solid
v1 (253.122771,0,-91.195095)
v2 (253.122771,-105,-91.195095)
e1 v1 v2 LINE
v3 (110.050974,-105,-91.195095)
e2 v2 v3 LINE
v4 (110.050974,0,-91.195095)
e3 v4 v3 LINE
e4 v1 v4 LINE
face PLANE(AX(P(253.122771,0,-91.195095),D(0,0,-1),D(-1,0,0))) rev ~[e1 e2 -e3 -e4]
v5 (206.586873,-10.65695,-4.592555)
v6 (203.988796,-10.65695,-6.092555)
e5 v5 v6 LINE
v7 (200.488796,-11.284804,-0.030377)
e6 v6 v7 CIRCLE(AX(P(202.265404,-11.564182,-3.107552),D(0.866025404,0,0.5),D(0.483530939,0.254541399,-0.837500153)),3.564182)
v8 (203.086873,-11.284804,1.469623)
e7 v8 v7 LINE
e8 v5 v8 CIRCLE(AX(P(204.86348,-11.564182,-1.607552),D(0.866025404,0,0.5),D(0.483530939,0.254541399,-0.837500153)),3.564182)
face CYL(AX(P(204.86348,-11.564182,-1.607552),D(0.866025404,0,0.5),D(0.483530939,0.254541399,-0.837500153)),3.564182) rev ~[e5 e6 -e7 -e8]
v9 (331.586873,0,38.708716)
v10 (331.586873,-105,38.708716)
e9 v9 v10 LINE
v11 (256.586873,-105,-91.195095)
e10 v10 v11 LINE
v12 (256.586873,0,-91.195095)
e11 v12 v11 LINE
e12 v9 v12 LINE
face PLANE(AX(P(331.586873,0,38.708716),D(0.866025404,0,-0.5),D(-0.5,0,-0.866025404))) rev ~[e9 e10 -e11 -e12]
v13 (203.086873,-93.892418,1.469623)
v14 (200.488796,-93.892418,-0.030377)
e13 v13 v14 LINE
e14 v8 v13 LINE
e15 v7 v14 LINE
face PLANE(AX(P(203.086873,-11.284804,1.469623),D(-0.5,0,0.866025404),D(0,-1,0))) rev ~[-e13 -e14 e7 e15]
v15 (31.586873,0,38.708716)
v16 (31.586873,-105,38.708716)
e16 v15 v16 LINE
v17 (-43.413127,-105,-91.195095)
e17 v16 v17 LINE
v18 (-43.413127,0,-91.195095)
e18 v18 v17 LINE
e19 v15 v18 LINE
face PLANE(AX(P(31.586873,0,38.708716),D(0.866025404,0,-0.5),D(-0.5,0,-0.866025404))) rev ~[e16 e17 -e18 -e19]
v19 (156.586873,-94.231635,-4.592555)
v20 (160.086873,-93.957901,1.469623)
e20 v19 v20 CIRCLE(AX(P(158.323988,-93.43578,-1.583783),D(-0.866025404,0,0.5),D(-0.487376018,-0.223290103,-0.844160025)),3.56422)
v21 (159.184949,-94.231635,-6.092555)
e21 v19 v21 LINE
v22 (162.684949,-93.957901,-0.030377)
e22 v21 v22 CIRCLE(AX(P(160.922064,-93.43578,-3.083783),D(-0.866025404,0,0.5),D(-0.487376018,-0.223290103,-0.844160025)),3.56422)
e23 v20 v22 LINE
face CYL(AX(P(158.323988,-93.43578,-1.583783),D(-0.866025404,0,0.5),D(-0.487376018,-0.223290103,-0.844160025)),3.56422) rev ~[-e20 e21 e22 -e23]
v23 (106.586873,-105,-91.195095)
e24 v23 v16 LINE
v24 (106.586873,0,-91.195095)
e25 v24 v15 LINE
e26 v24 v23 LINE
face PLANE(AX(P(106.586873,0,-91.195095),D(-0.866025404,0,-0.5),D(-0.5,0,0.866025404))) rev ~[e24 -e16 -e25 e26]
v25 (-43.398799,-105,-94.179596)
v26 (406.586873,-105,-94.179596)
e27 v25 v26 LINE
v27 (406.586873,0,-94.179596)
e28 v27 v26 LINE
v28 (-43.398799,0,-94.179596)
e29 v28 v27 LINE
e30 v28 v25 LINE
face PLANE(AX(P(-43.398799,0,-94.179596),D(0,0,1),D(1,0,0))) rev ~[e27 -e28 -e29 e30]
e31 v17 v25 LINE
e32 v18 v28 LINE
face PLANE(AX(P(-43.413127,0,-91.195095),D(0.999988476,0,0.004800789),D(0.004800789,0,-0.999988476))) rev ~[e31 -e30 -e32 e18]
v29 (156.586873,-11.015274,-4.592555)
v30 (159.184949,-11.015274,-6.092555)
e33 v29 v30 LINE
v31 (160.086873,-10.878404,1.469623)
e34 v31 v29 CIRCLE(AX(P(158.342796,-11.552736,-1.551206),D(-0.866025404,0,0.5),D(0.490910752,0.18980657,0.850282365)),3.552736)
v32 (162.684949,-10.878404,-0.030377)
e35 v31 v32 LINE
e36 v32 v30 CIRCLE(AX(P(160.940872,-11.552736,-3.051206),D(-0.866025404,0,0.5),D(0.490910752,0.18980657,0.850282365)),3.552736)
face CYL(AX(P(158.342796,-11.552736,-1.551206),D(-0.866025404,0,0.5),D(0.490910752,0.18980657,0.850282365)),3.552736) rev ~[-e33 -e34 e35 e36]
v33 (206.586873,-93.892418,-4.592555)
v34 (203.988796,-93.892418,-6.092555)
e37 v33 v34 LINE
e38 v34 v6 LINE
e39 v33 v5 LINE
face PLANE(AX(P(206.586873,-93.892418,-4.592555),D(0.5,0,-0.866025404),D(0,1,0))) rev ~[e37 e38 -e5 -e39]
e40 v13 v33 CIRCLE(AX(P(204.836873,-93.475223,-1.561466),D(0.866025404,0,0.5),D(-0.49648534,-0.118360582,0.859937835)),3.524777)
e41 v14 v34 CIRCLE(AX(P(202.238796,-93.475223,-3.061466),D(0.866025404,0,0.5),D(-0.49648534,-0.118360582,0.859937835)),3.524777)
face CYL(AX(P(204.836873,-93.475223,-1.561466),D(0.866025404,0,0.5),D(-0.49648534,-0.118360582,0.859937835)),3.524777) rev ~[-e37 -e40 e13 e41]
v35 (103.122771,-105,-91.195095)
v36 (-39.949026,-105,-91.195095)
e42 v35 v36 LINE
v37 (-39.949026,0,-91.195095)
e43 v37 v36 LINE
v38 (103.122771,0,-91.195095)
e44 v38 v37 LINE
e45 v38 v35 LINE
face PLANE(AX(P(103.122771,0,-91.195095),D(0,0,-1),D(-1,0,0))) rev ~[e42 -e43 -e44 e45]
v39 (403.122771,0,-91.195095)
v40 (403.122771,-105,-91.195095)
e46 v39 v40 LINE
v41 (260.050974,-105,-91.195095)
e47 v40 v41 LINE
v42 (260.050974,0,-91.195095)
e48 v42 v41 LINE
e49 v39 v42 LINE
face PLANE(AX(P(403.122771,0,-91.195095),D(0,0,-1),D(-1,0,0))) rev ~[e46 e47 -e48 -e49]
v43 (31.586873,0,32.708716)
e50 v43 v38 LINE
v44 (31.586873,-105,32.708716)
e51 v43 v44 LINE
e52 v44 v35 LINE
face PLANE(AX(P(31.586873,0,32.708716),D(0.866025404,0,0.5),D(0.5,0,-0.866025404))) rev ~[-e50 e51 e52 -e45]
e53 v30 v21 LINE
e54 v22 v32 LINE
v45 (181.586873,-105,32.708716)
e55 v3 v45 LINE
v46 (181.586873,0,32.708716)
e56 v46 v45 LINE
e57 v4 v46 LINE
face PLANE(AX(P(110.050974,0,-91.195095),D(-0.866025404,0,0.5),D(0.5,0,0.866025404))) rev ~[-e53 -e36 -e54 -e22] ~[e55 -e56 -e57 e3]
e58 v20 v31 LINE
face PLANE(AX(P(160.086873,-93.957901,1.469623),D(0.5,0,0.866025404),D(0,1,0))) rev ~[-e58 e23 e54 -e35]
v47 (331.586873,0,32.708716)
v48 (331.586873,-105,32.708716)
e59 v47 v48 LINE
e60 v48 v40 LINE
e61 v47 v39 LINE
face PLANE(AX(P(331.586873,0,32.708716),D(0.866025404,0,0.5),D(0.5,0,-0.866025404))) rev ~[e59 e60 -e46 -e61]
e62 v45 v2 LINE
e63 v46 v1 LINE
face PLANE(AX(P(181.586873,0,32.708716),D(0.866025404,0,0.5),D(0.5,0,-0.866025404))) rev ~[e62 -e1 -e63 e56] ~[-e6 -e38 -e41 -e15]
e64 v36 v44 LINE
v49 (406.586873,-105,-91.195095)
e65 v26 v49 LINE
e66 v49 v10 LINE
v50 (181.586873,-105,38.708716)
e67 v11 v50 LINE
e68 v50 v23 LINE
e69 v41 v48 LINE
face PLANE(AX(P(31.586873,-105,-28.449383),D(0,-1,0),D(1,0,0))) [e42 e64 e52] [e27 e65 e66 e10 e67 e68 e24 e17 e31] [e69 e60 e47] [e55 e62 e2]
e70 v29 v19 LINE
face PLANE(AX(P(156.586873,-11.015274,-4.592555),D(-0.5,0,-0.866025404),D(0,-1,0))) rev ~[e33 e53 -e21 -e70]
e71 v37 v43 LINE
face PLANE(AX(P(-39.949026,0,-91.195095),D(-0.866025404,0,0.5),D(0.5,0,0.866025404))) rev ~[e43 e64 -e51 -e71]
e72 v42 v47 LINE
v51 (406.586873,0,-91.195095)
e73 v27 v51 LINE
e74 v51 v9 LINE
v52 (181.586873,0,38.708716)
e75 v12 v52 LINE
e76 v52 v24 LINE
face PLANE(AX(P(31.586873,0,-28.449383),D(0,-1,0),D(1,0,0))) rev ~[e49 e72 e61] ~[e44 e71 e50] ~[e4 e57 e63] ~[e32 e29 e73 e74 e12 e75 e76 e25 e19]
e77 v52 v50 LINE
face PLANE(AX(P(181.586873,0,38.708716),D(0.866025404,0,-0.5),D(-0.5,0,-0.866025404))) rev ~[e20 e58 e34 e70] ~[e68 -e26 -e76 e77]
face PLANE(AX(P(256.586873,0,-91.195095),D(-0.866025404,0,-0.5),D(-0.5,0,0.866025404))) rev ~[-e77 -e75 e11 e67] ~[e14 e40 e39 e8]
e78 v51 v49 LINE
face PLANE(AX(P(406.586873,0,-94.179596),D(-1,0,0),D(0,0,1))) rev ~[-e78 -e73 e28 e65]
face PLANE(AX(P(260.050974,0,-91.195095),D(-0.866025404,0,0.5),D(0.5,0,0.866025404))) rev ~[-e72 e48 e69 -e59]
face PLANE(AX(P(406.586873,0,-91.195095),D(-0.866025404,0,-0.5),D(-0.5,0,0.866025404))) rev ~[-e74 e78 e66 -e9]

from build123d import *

# Parameters (mm, degrees)
F1_DEPTH = 105
F4_DEPTH = 3
F5_DEPTH = 3.2


with BuildPart() as f1:
    # F0 (on Front) → F1 (new body)
    with BuildSketch(Plane.XZ):
        Polygon((31.5868725905, 38.7087155582), (-43.4131274095, -91.1950950095), (-39.9490257943, -91.1950950095), (31.5868725905, 32.7087155582), (103.1227709754, -91.1950950095), (106.5868725905, -91.1950950095), align=None)
        Polygon((181.5868725905, 38.7087155582), (106.5868725905, -91.1950950095), (110.0509742057, -91.1950950095), (181.5868725905, 32.7087155582), (253.1227709754, -91.1950950095), (256.5868725905, -91.1950950095), align=None)
        Polygon((403.1227709754, -91.1950950095), (406.5868725905, -91.1950950095), (331.5868725905, 38.7087155582), (256.5868725905, -91.1950950095), (260.0509742057, -91.1950950095), (331.5868725905, 32.7087155582), align=None)
        Polygon((-39.9490257943, -91.1950950095), (-43.4131274095, -91.1950950095), (-43.3987992861, -94.1795955126), (406.5868725905, -94.1795955126), (406.5868725905, -91.1950950095), (403.1227709754, -91.1950950095), (260.0509742057, -91.1950950095), (256.5868725905, -91.1950950095), (253.1227709754, -91.1950950095), (110.0509742057, -91.1950950095), (106.5868725905, -91.1950950095), (103.1227709754, -91.1950950095), align=None)
    extrude(amount=F1_DEPTH)

    # F2 (on face) → F4 (cut)
    with BuildSketch(Plane(origin=(152.9515199535, 0, 88.3066012181), x_dir=(0, 1, 0), z_dir=(0.8660254038, 0, 0.5))):
        with BuildLine():
            Line((-11.2848039716, -100.270705274), (-93.8924178481, -100.270705274))
            ThreePointArc((-93.8924178481, -100.270705274), (-97, -103.770705274), (-93.8924178481, -107.270705274))
            Line((-93.8924178481, -107.270705274), (-10.656950064, -107.270705274))
            ThreePointArc((-10.656950064, -107.270705274), (-8.0142508316, -103.5055153734), (-11.2848039716, -100.270705274))
        make_face()
    extrude(amount=-F4_DEPTH, mode=Mode.SUBTRACT)

    # F3 (on face) → F5 (cut)
    with BuildSketch(Plane(origin=(119.4287889323, 0, -68.952243439), x_dir=(0, -1, 0), z_dir=(-0.8660254038, 0, 0.5))):
        with BuildLine():
            Line((93.957901001, 81.3161673165), (10.8784036711, 81.3161673165))
            ThreePointArc((10.8784036711, 81.3161673165), (8.0006789358, 77.7585614935), (11.0152736306, 74.3161673165))
            Line((11.0152736306, 74.3161673165), (94.2316353321, 74.3161673165))
            ThreePointArc((94.2316353321, 74.3161673165), (96.9972779307, 77.9296696835), (93.957901001, 81.3161673165))
        make_face()
    extrude(amount=-F5_DEPTH, mode=Mode.SUBTRACT)


solid = f1.part
